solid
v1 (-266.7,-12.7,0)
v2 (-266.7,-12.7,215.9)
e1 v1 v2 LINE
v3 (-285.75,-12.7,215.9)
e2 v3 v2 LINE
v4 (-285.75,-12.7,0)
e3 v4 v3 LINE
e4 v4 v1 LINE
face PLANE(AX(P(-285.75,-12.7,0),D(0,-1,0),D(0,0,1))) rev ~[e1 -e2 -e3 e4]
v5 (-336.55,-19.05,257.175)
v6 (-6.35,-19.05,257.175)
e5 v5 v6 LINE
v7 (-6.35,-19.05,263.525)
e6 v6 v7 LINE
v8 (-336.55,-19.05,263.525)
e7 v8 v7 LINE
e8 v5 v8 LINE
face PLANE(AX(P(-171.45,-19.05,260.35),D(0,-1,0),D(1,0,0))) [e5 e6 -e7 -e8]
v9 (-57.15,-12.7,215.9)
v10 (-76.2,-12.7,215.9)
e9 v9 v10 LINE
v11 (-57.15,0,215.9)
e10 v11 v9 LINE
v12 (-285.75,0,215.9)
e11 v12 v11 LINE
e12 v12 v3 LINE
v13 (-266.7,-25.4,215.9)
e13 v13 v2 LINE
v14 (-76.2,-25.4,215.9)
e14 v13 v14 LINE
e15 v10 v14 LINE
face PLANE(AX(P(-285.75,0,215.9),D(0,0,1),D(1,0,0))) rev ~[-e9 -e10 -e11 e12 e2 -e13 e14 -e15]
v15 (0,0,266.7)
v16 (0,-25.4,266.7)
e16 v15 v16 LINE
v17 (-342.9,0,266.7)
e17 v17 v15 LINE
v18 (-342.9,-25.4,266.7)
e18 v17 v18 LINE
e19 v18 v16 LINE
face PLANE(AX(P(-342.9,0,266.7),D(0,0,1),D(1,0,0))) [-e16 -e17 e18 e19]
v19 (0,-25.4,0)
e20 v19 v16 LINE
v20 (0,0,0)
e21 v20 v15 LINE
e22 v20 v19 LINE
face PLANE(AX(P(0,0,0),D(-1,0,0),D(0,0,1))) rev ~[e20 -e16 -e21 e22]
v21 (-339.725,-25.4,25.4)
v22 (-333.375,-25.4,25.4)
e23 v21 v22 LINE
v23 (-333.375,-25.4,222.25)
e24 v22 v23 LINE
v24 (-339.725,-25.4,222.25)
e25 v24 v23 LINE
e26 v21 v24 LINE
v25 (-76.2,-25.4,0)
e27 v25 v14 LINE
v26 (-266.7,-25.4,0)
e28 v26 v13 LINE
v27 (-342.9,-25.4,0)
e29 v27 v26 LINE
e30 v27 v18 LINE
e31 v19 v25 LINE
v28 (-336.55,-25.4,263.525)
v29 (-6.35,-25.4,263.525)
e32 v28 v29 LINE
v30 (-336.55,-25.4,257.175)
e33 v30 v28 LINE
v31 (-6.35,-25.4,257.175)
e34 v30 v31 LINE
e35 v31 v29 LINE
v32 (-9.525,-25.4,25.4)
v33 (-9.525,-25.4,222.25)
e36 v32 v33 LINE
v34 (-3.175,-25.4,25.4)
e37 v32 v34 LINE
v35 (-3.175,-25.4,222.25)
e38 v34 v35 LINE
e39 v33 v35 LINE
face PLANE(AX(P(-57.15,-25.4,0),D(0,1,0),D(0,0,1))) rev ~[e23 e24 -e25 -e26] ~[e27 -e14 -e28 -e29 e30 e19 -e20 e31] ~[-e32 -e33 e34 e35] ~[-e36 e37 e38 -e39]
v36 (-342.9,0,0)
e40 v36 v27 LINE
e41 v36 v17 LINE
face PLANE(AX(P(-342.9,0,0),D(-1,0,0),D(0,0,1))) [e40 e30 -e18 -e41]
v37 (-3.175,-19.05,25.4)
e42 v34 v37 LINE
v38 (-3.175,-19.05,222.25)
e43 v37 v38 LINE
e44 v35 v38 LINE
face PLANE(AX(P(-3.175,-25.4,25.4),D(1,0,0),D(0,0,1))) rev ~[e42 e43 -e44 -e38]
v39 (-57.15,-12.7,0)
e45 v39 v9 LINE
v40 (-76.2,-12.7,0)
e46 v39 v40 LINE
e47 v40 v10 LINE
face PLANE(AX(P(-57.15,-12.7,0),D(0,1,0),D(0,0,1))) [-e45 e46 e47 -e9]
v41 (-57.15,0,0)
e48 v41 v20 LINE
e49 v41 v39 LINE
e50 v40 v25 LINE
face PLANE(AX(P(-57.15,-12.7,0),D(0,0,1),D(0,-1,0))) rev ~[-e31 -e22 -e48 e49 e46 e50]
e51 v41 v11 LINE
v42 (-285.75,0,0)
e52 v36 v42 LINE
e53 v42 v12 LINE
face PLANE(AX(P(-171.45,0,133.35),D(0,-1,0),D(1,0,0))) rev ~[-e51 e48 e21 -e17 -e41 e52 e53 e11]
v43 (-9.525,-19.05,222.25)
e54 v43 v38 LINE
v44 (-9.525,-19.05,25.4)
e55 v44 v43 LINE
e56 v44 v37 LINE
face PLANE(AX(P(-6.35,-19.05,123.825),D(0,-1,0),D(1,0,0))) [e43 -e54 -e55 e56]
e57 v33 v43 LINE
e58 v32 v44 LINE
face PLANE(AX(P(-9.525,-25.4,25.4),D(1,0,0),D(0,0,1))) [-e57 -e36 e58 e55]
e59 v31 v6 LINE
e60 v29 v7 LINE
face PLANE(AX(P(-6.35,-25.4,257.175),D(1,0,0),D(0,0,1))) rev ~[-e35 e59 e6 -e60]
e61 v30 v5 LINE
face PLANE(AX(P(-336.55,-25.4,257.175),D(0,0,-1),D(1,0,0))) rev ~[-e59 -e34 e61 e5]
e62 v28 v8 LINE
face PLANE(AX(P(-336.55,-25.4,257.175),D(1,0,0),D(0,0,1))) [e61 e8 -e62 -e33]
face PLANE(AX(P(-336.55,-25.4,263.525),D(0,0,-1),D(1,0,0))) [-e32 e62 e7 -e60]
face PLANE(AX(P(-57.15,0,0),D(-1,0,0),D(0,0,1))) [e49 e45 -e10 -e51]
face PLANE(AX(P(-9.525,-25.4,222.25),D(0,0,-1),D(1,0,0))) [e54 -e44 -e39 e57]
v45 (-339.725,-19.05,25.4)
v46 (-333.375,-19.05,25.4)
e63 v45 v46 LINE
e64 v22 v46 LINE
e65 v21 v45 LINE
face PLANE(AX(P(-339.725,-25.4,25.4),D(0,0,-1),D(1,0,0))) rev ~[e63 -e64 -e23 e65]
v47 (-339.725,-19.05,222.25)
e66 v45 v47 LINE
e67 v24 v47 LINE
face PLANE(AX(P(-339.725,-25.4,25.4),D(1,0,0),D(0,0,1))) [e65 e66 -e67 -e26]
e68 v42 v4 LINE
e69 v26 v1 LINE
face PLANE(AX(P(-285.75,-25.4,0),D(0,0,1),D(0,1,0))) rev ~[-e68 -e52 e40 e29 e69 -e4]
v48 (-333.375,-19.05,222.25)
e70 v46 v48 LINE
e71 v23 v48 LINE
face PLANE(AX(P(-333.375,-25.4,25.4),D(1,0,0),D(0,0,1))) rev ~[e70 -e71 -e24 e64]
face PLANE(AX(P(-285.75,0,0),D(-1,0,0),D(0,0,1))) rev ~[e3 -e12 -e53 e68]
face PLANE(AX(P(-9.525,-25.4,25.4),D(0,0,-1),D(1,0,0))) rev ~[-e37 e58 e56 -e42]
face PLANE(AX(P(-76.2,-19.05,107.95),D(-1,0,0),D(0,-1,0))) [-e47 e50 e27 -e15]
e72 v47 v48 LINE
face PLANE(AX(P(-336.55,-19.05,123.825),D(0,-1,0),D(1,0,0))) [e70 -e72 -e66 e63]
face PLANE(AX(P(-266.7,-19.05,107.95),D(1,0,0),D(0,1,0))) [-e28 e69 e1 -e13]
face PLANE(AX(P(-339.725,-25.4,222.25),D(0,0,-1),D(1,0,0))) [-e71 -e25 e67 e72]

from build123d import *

# Parameters (mm, degrees)
F0_W      = 342.9
F0_H      = 266.7
F1_DEPTH  = 25.4
F2_W      = 114.3
F2_H      = 215.9
F3_DEPTH  = 25.4
F4_W      = 12.7
F4_H      = 215.9
F5_DEPTH  = 19.05
F6_W      = 12.7
F6_H      = 215.9
F7_DEPTH  = 19.05
F9_W      = 330.2
F9_H      = 6.35
F10_DEPTH = 6.35
F11_W     = 6.35
F11_H     = 196.85
F12_DEPTH = 6.35


# Not quite as in the source:
# - a feature names something its author has since deleted; it is built from what else it names


with BuildPart() as f1:
    # F0 (on Front) → F1 (new body)
    with BuildSketch(Plane.XZ):
        with Locations((-171.45, 133.35)):
            Rectangle(F0_W, F0_H)
    extrude(amount=F1_DEPTH)

    # F2 (on face) → F3 (cut)
    with BuildSketch(Plane(origin=(0, 0, 0), x_dir=(-1, 0, 0), z_dir=(0, 1, 0))):
        with Locations((228.6, 107.95)):
            Rectangle(F2_W, F2_H)
        with Locations((114.3, 107.95)):
            Rectangle(F2_W, F2_H)
    extrude(amount=-F3_DEPTH, mode=Mode.SUBTRACT)

    # F4 (on face) → F5 (join)
    with BuildSketch(Plane.YZ.offset(-285.75)):
        with Locations((-19.05, 107.95)):
            Rectangle(F4_W, F4_H)
    extrude(amount=F5_DEPTH)

    # F6 (on face) → F7 (join)
    with BuildSketch(Plane(origin=(-57.15, 0, 0), x_dir=(0, -1, 0), z_dir=(-1, 0, 0))):
        with Locations((19.05, 107.95)):
            Rectangle(F6_W, F6_H)
    extrude(amount=F7_DEPTH)

    # F9 (on face) → F10 (cut)
    with BuildSketch(Plane.XZ.offset(25.4)):
        with Locations((-171.45, 260.35)):
            Rectangle(F9_W, F9_H)
    extrude(amount=-F10_DEPTH, mode=Mode.SUBTRACT)

    # F11 (on face) → F12 (cut)
    with BuildSketch(Plane.XZ.offset(25.4)):
        with Locations((-336.55, 123.825)):
            Rectangle(F11_W, F11_H)
        with Locations((-6.35, 123.825)):
            Rectangle(F11_W, F11_H)
    extrude(amount=-F12_DEPTH, mode=Mode.SUBTRACT)


solid = f1.part
